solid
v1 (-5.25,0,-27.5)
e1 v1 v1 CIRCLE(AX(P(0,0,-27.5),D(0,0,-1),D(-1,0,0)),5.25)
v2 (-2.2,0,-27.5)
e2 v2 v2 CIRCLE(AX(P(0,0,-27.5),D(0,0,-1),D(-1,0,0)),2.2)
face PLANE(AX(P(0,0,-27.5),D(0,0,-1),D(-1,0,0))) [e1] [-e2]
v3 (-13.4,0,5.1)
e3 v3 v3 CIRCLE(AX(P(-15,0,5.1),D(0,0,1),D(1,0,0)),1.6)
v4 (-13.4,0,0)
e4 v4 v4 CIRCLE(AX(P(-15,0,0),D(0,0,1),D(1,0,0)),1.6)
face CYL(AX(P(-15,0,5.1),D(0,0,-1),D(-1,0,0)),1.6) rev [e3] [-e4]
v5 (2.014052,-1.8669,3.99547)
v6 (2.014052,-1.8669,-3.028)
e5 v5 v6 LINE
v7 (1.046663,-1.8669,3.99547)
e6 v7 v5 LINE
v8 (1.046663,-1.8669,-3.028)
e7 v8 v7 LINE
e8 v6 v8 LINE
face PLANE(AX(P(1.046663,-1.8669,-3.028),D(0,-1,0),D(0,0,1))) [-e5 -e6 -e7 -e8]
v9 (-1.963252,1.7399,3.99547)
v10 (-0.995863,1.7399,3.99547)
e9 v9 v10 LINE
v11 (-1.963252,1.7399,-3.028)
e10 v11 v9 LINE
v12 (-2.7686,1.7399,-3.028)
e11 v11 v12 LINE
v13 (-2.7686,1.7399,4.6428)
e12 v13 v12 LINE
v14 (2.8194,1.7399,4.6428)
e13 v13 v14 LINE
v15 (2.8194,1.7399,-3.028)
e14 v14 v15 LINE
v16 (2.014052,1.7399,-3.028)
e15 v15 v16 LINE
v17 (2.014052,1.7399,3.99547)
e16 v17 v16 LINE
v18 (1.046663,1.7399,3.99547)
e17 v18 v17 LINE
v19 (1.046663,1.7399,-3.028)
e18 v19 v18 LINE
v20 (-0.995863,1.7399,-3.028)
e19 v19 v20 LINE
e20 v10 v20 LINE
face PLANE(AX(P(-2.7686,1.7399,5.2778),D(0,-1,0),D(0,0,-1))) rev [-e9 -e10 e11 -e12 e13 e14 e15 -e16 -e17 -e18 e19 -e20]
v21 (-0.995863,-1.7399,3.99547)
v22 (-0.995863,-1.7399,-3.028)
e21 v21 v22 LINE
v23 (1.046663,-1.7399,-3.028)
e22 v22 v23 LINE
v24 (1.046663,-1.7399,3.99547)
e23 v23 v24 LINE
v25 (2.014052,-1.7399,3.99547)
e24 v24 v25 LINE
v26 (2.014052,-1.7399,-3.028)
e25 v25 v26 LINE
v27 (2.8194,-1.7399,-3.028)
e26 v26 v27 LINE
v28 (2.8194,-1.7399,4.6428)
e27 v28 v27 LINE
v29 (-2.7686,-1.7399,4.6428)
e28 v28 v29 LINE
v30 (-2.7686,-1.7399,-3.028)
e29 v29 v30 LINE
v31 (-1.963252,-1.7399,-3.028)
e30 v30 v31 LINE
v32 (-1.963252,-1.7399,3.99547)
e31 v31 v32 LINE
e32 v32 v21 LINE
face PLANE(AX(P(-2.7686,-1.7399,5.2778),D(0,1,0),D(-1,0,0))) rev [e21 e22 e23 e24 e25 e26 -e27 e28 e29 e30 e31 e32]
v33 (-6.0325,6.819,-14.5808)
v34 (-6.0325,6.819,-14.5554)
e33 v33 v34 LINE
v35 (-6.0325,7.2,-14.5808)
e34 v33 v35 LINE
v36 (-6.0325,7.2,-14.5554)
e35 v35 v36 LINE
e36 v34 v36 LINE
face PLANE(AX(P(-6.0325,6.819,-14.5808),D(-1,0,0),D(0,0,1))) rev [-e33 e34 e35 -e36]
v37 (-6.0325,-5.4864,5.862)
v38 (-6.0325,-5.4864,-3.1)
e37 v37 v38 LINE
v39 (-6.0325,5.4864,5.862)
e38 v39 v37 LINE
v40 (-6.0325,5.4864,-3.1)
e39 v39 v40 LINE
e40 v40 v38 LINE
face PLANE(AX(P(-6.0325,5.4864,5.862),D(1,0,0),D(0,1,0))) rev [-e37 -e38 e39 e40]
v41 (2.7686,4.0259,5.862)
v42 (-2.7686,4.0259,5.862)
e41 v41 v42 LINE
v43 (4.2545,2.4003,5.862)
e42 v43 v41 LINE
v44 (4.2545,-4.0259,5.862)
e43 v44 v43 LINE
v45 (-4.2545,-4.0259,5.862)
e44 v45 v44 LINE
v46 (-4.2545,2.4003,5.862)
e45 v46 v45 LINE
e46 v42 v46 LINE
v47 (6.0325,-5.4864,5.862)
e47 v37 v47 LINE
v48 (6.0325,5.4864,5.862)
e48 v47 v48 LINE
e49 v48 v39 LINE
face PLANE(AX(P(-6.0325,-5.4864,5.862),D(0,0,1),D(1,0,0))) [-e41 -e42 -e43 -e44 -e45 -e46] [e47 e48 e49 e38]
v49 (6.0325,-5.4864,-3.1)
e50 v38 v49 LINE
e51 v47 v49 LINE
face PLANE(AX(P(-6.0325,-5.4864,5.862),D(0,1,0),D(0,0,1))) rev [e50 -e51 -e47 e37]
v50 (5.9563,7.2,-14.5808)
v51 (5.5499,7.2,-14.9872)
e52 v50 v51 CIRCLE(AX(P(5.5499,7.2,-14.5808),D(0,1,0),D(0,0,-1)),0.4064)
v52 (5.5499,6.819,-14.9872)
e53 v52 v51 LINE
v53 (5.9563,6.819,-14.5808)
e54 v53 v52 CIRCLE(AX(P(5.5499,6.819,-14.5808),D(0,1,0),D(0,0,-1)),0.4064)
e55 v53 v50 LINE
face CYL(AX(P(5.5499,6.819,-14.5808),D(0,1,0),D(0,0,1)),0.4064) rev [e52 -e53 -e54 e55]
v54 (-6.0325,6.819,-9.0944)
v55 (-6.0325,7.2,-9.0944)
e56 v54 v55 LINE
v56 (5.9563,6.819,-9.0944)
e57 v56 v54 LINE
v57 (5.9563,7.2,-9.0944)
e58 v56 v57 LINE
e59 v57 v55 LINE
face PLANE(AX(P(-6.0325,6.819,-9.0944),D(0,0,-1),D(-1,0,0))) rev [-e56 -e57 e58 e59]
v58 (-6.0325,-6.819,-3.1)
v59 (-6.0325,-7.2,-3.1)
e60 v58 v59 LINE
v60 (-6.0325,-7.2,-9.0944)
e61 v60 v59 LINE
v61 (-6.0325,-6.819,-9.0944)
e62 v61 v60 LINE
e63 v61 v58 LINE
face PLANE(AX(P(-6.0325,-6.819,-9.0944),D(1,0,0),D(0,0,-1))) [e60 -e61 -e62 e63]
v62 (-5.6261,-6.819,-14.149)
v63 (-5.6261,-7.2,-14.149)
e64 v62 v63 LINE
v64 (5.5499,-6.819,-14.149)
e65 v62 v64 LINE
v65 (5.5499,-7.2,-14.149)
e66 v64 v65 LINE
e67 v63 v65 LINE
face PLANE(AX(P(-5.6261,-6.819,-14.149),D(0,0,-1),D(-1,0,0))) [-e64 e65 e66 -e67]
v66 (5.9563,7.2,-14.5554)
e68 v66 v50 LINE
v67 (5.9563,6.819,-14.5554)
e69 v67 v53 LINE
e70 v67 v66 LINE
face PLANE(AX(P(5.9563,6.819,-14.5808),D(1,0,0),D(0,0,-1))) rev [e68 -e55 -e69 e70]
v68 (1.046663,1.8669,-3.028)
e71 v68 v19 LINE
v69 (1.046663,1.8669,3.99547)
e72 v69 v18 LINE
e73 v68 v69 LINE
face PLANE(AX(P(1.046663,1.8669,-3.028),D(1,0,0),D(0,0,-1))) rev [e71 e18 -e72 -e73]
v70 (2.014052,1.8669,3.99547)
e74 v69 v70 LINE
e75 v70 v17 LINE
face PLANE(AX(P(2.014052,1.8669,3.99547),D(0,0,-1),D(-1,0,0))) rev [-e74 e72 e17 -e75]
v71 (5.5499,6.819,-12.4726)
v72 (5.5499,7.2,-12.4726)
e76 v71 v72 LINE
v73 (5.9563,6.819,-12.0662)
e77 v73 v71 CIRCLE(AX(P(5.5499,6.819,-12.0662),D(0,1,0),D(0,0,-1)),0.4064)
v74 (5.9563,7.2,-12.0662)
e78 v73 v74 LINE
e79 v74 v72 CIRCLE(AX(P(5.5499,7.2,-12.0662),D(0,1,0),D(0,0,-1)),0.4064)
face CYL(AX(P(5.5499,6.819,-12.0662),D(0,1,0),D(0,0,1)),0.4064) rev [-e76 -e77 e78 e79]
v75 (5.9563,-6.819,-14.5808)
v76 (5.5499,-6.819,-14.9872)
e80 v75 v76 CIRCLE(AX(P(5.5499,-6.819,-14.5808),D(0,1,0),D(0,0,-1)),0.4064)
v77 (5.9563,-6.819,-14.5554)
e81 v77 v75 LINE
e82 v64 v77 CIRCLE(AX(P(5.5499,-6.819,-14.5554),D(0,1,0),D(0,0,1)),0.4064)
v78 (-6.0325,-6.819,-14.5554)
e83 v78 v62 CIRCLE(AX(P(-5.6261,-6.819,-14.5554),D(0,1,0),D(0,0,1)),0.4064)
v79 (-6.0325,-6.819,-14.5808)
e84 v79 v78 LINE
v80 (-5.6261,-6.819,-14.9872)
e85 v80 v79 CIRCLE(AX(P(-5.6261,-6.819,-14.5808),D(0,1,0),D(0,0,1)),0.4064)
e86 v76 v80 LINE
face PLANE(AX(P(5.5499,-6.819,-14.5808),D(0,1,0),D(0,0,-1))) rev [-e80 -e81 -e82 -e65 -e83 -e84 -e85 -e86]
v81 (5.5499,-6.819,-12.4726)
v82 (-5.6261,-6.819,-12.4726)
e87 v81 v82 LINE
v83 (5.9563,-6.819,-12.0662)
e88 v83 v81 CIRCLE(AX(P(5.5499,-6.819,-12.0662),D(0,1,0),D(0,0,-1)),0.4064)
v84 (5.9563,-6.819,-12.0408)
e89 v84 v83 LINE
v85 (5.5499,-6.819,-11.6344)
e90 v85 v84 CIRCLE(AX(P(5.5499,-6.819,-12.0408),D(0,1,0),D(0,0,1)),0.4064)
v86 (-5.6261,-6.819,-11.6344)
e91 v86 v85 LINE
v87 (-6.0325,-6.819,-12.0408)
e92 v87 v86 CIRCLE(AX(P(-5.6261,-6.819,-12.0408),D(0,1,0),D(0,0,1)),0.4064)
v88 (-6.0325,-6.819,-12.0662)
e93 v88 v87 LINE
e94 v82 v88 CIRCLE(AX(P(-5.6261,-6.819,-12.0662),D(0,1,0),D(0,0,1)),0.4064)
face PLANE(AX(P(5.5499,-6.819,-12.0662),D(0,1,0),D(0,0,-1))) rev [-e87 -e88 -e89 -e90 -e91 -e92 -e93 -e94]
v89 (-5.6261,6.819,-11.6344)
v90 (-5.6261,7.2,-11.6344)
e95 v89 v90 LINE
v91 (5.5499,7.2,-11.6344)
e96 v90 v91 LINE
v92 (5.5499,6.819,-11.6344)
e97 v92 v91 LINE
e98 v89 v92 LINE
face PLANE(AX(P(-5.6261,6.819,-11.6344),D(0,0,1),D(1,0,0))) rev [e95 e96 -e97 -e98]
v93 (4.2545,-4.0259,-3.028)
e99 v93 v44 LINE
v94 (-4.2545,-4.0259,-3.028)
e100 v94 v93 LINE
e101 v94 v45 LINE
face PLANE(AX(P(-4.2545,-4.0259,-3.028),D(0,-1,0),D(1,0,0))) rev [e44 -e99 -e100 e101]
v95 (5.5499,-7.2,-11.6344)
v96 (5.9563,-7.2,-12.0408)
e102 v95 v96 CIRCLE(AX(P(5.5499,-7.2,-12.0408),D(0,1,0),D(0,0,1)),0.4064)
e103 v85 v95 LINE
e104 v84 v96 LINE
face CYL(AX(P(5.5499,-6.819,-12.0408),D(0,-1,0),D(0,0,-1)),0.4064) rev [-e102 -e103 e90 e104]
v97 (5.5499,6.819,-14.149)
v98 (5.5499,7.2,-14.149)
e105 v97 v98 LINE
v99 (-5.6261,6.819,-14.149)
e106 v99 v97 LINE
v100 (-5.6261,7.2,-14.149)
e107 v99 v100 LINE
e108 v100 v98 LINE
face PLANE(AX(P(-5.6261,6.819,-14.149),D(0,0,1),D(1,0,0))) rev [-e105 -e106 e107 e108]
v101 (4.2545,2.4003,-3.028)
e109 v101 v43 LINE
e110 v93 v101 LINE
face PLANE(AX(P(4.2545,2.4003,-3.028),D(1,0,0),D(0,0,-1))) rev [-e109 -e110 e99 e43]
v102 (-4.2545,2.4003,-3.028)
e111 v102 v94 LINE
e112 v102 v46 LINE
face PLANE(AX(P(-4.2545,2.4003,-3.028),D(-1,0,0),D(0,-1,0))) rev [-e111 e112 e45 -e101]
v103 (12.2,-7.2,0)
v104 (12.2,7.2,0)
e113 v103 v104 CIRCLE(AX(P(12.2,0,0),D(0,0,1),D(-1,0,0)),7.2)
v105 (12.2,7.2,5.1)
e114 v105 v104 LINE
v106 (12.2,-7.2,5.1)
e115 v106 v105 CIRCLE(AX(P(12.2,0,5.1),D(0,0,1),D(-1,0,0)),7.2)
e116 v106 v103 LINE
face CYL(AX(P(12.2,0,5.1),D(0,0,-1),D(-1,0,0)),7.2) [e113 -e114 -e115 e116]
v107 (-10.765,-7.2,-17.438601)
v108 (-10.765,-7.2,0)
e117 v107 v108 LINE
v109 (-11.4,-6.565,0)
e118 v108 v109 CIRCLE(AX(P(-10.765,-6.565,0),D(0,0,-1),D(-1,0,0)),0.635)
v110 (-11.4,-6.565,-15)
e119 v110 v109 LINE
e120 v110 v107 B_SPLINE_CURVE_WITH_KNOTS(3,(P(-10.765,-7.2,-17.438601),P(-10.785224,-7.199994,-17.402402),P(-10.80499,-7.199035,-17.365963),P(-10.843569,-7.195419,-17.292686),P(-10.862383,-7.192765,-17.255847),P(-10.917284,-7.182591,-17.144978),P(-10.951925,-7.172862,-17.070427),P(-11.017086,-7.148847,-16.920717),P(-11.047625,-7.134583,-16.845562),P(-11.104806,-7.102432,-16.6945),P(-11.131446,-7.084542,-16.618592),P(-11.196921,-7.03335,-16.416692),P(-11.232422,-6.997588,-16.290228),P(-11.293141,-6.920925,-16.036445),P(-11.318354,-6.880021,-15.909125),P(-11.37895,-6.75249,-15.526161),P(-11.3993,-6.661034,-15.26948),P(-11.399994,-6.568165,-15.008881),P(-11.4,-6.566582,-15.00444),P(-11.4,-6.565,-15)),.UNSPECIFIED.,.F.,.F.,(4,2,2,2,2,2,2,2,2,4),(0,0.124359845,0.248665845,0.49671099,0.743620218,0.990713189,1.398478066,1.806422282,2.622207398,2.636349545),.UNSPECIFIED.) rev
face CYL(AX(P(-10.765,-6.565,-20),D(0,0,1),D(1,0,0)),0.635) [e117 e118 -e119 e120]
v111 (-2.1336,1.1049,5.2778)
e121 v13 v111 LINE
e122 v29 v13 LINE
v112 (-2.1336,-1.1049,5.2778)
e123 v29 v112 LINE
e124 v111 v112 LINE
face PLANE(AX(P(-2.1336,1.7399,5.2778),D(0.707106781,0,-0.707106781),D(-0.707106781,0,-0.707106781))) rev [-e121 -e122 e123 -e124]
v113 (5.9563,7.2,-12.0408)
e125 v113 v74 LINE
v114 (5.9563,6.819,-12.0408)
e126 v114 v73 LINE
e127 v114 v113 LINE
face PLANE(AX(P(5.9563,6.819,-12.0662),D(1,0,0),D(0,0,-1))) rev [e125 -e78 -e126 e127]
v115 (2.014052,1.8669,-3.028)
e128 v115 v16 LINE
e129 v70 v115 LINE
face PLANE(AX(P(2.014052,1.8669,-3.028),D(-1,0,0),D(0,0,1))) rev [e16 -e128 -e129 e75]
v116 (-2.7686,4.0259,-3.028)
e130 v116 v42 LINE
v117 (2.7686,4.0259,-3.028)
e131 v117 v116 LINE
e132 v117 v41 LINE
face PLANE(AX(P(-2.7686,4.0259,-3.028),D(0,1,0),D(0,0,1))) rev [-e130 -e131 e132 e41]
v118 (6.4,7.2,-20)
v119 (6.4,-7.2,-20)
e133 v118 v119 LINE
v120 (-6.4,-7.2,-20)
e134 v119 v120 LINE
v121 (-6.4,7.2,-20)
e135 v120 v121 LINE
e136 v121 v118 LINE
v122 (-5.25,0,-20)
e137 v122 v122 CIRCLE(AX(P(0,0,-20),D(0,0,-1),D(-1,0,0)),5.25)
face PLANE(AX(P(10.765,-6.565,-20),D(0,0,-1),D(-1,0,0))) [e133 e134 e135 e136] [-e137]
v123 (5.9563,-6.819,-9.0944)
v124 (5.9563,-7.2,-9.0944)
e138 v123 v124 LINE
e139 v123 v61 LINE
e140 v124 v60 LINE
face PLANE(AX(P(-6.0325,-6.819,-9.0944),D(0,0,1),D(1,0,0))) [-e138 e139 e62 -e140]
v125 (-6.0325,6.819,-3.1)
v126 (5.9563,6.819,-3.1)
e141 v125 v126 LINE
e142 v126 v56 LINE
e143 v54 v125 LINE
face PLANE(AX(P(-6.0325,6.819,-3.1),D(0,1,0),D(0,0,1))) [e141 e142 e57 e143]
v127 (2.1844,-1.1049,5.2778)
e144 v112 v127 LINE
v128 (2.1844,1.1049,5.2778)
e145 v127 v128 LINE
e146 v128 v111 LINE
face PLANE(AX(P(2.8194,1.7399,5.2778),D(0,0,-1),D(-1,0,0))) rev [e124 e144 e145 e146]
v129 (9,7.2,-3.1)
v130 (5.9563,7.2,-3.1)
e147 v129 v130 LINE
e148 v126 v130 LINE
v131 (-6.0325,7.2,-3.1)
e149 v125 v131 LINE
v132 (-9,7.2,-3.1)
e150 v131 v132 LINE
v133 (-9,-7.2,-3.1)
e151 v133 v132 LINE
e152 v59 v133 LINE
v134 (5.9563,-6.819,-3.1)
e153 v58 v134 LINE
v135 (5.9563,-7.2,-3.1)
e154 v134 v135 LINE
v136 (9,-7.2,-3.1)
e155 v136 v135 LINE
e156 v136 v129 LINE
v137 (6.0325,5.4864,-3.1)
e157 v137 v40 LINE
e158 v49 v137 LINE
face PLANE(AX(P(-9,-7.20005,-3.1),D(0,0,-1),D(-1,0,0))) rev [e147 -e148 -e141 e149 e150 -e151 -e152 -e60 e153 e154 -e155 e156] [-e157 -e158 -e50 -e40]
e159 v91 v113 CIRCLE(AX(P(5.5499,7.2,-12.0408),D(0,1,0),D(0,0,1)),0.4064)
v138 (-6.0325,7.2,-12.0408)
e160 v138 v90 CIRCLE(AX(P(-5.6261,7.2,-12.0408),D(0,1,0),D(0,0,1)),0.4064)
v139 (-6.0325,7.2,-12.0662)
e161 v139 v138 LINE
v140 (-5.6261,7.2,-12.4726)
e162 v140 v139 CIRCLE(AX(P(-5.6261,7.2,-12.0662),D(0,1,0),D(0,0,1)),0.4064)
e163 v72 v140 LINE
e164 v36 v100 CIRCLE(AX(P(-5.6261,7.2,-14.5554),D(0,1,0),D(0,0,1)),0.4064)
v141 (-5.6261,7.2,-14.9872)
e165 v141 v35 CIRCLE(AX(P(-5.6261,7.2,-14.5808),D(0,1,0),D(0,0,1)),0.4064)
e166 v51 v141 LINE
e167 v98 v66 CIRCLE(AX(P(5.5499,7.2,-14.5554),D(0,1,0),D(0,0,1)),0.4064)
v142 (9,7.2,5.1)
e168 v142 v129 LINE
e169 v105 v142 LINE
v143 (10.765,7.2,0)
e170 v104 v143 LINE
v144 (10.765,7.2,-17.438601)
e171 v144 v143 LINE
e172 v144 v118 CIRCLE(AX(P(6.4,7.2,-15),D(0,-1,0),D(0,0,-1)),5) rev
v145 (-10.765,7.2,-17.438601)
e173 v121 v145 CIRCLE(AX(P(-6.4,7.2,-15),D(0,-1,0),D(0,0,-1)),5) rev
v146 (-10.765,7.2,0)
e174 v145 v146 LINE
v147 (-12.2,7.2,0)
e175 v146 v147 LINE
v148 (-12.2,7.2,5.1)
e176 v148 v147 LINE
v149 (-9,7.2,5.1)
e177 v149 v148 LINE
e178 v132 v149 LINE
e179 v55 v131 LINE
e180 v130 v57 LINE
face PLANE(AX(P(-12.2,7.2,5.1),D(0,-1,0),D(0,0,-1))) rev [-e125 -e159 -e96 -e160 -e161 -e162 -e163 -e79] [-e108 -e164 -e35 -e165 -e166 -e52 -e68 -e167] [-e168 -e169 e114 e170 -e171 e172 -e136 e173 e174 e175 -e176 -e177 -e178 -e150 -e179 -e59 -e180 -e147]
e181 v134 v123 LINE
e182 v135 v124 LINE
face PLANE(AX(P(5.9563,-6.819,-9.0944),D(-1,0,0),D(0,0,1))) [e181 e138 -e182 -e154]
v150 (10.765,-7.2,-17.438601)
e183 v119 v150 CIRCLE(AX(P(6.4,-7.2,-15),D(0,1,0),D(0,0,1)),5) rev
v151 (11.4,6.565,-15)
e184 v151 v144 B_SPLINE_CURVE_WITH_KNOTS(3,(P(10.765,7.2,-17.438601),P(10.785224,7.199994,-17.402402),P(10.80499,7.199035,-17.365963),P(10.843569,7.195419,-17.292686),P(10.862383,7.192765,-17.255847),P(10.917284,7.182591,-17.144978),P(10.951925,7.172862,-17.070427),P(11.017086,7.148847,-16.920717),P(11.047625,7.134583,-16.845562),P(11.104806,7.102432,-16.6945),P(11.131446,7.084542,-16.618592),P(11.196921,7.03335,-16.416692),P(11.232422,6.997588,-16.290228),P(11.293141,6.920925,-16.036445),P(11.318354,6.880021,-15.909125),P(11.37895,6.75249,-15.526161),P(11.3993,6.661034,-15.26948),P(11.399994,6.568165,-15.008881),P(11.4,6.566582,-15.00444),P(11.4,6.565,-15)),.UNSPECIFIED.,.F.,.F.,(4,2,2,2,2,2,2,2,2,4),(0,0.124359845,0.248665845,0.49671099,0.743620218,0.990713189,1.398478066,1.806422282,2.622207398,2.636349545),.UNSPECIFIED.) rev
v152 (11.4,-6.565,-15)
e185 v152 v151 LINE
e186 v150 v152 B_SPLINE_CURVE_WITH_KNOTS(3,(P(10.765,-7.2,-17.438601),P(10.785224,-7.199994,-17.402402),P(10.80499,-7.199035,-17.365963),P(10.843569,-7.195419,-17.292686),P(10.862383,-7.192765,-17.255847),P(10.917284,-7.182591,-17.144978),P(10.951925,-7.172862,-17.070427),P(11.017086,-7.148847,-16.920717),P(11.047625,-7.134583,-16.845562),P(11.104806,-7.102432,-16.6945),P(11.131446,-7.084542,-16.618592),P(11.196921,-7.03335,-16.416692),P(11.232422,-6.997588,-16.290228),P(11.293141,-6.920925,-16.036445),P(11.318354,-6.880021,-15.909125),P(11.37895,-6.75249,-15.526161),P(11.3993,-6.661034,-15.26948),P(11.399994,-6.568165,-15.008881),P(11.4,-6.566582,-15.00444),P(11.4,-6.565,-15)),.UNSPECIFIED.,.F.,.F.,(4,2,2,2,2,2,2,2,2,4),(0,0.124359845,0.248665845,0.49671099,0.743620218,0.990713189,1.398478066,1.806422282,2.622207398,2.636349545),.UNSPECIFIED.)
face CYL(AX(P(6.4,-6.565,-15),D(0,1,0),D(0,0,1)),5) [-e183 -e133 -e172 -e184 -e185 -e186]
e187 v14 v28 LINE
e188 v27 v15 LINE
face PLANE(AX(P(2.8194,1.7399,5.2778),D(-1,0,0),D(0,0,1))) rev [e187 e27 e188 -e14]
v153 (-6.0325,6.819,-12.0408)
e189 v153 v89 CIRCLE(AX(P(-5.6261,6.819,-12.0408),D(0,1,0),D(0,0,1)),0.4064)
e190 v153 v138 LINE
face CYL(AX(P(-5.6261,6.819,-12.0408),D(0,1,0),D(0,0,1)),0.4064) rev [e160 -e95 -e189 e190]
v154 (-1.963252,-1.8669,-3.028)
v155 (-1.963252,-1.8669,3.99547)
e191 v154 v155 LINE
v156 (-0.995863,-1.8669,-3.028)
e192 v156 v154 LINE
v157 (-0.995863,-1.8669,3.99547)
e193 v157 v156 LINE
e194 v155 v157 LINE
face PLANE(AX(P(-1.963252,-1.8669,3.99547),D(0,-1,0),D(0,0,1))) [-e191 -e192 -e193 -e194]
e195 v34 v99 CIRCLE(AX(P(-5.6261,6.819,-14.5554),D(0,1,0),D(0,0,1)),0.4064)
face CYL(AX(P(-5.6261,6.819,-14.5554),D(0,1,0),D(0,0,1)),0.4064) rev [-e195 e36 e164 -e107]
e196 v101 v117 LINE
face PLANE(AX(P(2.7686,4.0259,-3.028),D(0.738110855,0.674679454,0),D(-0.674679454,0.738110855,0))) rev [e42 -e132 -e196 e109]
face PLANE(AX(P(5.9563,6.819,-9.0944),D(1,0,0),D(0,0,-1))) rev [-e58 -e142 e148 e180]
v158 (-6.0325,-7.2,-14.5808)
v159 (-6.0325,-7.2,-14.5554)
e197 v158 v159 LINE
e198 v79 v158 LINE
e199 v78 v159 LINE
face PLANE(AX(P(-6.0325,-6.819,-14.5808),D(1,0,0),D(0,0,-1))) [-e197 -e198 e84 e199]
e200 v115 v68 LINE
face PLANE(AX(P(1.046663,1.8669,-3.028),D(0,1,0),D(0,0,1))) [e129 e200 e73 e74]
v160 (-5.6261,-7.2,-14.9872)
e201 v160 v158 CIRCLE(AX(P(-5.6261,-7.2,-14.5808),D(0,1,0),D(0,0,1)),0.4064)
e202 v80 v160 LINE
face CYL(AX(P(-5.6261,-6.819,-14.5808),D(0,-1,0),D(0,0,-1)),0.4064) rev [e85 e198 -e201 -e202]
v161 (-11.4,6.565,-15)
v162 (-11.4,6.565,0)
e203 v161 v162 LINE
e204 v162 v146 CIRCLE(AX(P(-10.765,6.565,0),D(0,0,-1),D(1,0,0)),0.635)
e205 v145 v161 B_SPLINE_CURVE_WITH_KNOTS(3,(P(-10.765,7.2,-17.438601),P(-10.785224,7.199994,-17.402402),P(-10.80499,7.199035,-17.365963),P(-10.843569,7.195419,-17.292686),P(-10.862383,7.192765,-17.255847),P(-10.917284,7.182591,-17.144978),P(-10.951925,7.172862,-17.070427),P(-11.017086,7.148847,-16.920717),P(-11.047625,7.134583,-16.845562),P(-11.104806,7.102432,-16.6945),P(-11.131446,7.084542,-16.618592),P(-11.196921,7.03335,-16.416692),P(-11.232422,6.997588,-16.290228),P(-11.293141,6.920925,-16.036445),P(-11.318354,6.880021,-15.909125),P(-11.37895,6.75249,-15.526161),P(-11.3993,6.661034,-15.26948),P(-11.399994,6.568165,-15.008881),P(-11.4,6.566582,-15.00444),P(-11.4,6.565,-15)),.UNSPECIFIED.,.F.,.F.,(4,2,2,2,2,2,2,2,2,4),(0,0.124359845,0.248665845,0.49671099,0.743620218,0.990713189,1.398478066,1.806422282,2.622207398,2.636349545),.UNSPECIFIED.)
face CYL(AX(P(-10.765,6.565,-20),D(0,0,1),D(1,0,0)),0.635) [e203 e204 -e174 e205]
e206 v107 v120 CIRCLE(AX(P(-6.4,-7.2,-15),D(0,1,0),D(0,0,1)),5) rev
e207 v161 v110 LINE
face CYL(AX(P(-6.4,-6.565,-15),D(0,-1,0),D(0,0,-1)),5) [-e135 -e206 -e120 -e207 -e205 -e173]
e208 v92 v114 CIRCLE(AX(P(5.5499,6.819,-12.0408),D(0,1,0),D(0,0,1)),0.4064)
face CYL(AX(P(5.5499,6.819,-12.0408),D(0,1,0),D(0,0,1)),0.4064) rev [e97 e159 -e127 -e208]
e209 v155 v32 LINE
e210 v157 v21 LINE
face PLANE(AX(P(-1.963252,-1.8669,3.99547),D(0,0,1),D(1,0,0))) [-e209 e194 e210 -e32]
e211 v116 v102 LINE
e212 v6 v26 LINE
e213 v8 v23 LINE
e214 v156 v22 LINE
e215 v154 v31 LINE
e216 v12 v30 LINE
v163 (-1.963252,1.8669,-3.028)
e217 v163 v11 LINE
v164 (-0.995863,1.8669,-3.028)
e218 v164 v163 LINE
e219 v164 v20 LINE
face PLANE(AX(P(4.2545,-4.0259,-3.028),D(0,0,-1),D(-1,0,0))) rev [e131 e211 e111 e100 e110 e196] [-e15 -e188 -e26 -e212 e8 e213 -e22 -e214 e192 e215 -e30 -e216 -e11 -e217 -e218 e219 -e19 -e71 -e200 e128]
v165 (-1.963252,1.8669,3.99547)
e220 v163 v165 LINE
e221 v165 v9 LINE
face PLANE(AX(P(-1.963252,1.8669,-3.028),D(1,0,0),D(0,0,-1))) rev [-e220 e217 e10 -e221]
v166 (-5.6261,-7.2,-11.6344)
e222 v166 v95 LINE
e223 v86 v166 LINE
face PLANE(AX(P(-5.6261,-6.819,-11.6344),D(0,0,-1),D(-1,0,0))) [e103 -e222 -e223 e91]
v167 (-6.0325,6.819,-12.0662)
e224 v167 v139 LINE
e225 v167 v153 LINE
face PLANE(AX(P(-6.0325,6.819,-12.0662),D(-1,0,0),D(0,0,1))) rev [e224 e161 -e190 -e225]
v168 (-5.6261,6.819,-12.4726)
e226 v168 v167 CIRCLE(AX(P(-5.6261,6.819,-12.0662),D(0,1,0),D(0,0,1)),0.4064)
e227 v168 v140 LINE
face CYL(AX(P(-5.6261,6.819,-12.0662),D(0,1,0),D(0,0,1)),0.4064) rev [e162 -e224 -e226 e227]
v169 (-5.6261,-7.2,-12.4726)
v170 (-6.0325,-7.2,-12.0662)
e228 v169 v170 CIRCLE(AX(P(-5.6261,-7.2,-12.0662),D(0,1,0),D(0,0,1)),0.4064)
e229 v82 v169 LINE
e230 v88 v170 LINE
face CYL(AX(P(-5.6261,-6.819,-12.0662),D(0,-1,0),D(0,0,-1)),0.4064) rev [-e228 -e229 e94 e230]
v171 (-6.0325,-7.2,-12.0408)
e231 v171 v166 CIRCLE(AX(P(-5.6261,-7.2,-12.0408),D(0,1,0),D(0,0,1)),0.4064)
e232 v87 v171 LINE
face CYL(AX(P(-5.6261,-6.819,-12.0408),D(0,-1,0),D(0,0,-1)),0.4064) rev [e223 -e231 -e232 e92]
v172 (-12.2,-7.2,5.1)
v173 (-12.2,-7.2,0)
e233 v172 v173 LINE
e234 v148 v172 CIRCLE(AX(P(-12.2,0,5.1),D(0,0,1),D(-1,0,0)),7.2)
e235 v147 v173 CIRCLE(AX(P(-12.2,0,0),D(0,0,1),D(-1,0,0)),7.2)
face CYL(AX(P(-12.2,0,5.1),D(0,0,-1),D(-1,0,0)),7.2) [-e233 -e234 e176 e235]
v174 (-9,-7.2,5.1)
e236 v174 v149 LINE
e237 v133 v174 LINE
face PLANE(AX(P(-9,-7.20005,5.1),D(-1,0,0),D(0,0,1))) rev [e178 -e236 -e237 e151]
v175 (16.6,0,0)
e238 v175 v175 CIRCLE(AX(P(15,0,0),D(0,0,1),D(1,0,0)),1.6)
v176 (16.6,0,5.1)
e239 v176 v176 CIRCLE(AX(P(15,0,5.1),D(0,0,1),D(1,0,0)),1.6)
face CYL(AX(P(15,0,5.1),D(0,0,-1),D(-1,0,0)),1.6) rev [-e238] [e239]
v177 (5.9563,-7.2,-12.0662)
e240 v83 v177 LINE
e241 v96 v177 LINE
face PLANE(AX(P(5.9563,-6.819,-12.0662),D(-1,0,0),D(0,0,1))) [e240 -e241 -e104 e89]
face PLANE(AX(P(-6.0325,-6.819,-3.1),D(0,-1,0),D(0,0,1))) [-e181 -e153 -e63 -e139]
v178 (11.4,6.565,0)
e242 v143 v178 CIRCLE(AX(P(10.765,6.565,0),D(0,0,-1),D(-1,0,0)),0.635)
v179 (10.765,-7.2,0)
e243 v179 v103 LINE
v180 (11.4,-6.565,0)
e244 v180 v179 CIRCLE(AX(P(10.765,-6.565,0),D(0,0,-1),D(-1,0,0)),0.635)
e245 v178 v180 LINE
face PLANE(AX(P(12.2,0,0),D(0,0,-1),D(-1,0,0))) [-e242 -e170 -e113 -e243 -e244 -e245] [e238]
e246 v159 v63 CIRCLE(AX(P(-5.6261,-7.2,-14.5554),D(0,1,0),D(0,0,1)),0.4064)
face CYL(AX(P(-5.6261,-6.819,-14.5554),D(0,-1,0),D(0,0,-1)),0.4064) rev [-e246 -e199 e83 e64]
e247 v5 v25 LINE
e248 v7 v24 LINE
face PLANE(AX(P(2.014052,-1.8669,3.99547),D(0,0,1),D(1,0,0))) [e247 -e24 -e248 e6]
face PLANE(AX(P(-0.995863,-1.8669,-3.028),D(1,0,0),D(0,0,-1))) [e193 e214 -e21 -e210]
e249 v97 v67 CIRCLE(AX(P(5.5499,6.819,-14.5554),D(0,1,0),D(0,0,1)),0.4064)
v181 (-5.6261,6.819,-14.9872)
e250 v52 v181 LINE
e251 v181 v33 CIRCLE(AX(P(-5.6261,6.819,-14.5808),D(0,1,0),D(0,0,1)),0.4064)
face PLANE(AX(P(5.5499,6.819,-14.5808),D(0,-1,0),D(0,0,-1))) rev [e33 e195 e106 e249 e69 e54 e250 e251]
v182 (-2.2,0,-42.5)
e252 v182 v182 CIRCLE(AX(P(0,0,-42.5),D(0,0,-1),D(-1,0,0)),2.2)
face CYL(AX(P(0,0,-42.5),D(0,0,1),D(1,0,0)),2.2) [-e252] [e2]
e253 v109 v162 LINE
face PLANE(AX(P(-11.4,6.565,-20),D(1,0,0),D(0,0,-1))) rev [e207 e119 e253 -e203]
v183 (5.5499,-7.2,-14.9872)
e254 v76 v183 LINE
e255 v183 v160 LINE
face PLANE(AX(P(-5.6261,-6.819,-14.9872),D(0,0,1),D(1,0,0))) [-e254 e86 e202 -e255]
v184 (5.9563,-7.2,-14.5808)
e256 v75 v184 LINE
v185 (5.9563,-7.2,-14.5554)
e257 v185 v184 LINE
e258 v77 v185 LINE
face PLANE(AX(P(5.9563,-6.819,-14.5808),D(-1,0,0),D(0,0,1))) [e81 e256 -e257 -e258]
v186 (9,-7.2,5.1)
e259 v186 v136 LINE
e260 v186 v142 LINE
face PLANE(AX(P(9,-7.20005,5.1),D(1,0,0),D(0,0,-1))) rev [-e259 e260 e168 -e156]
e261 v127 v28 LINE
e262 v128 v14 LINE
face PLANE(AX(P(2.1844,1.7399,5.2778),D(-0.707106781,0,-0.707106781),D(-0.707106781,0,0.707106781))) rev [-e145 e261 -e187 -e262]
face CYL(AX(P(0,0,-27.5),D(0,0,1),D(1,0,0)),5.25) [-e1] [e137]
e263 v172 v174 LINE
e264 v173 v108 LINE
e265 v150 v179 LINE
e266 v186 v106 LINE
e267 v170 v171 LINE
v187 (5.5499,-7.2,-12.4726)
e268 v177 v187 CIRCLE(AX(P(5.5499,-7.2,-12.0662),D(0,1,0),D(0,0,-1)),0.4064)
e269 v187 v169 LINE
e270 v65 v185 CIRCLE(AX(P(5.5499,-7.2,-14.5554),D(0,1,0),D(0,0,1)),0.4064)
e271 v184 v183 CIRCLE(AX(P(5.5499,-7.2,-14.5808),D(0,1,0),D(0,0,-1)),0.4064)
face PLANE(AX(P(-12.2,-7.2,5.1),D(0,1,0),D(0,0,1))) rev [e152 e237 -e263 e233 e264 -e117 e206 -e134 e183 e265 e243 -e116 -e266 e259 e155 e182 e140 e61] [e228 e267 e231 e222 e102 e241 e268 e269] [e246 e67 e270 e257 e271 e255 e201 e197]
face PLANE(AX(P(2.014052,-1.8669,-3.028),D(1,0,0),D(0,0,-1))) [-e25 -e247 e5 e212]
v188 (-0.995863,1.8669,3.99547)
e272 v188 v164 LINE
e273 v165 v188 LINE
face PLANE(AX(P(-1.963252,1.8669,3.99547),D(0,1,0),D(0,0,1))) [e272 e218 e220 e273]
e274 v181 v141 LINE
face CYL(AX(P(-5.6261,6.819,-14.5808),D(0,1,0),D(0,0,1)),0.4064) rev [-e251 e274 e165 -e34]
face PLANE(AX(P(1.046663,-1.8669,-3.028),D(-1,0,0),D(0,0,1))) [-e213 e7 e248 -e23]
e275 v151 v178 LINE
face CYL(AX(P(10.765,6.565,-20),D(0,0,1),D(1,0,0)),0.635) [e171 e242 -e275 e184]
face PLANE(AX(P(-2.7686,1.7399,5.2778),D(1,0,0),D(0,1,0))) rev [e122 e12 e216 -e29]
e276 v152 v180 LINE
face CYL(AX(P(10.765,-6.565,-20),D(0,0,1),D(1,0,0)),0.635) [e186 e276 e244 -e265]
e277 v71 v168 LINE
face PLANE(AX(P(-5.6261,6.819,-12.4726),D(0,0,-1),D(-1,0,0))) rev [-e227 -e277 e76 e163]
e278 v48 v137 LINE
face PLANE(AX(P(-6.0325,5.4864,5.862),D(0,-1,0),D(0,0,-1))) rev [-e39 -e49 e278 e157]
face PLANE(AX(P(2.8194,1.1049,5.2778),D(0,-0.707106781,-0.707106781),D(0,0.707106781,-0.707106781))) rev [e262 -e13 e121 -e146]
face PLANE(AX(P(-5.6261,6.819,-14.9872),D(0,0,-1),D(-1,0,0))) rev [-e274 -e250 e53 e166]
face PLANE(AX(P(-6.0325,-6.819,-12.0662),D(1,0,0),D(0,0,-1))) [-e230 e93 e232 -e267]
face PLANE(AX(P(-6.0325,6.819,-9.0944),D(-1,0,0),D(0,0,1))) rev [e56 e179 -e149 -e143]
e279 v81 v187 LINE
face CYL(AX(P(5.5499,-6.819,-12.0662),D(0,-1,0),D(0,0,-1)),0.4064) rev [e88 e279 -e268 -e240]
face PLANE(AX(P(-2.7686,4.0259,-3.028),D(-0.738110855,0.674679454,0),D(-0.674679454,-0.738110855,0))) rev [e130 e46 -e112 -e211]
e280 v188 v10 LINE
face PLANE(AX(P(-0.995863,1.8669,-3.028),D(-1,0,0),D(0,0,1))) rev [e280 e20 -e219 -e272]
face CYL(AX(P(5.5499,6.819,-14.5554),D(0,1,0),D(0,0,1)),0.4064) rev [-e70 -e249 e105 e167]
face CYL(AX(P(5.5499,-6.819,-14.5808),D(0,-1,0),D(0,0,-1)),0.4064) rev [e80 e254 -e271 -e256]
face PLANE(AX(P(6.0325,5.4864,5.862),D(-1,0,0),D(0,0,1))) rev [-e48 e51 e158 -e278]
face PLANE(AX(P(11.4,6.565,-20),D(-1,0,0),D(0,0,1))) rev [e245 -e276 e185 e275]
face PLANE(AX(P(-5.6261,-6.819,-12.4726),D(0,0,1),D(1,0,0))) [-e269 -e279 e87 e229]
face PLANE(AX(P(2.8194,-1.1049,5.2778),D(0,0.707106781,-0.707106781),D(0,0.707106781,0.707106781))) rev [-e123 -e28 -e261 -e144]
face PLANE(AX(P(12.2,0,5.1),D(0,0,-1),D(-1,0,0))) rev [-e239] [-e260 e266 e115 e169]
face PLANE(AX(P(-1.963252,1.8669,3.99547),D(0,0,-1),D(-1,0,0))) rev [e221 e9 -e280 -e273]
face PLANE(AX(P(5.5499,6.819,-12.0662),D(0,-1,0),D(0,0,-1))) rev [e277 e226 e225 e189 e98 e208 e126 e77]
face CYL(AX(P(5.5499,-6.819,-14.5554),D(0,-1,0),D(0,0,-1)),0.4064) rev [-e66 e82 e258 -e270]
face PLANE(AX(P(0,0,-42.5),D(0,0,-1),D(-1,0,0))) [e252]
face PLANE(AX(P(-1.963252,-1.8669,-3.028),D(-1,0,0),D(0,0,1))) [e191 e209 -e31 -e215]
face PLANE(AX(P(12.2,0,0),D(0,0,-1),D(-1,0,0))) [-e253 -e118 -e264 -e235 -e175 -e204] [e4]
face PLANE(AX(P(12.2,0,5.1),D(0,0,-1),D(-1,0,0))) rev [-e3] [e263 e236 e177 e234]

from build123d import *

# Parameters (mm, degrees)
SKETCH1_R           = 1.6
BOSS_EXTRUDE1_DEPTH = 5.1
BOSS_EXTRUDE2_DEPTH = 20
SKETCH3_R           = 5.25
BOSS_EXTRUDE3_DEPTH = 7.5
SKETCH4_R           = 2.2
BOSS_EXTRUDE4_DEPTH = 15
SKETCH11_W          = 18
SKETCH11_H          = 8.2
CUT_EXTRUDE3_DEPTH  = 49.887319419
SKETCH5_W           = 12.065
SKETCH5_H           = 10.9728
BOSS_EXTRUDE5_DEPTH = 0.762
SKETCH12_W          = 12.065
SKETCH12_H          = 10.9728
BOSS_EXTRUDE9_DEPTH = 8.2
CUT_EXTRUDE1_DEPTH  = 8.89
SKETCH7_W           = 5.588
SKETCH7_H           = 3.4798
BOSS_EXTRUDE6_DEPTH = 8.3058
CHAMFER1_SIZE       = 0.635
SKETCH8_W           = 0.967388598
SKETCH8_H           = 7.023469871
BOSS_EXTRUDE7_DEPTH = 0.127
SKETCH9_W           = 11.9888
SKETCH9_H           = 5.9944
CUT_EXTRUDE2_DEPTH  = 0.381
FILLET1_R           = 5


with BuildPart() as part:
    # Sketch1 → Boss-Extrude1 (new body)
    with BuildSketch(Plane.XY):
        with BuildLine():
            Line((-12.2, -7.2), (12.2, -7.2))
            ThreePointArc((12.2, -7.2), (19.4, 0), (12.2, 7.2))
            Line((12.2, 7.2), (-12.2, 7.2))
            ThreePointArc((-12.2, 7.2), (-19.4, 0), (-12.2, -7.2))
        make_face()
        with Locations((-15, 0)):
            Circle(SKETCH1_R, mode=Mode.SUBTRACT)
        with Locations((15, 0)):
            Circle(SKETCH1_R, mode=Mode.SUBTRACT)
    extrude(amount=BOSS_EXTRUDE1_DEPTH)

    # Sketch2 → Boss-Extrude2 (add)
    with BuildSketch(Plane(origin=(0, 0, 0), x_dir=(-1, 0, 0), z_dir=(0, 0, -1))):
        with BuildLine():
            Line((-10.765, 7.2), (10.765, 7.2))
            ThreePointArc((10.765, 7.2), (11.214012806, 7.014012806), (11.4, 6.565))
            Line((11.4, 6.565), (11.4, -6.565))
            ThreePointArc((11.4, -6.565), (11.214012806, -7.014012806), (10.765, -7.2))
            Line((10.765, -7.2), (-10.765, -7.2))
            ThreePointArc((-10.765, -7.2), (-11.214012806, -7.014012806), (-11.4, -6.565))
            Line((-11.4, -6.565), (-11.4, 6.565))
            ThreePointArc((-11.4, 6.565), (-11.214012806, 7.014012806), (-10.765, 7.2))
        make_face()
    extrude(amount=BOSS_EXTRUDE2_DEPTH)

    # Sketch3 → Boss-Extrude3 (add)
    with BuildSketch(Plane(origin=(0, 0, -20), x_dir=(-1, 0, 0), z_dir=(0, 0, -1))):
        Circle(SKETCH3_R)
    extrude(amount=BOSS_EXTRUDE3_DEPTH)

    # Sketch4 → Boss-Extrude4 (add)
    with BuildSketch(Plane(origin=(0, 0, -27.5), x_dir=(-1, 0, 0), z_dir=(0, 0, -1))):
        Circle(SKETCH4_R)
    extrude(amount=BOSS_EXTRUDE4_DEPTH)

    # Sketch11 → Cut-Extrude3 (cut, through all)
    with BuildSketch(Plane(origin=(0, 7.2, 0), x_dir=(1, 0, 0), z_dir=(0, 1, 0))):
        with Locations((0, -1)):
            Rectangle(SKETCH11_W, SKETCH11_H)
    extrude(amount=-CUT_EXTRUDE3_DEPTH, mode=Mode.SUBTRACT)



with BuildPart() as body_2:
    # Sketch5 → Boss-Extrude5 (new body)
    with BuildSketch(Plane.XY.offset(5.1)):
        Rectangle(SKETCH5_W, SKETCH5_H)
    extrude(amount=BOSS_EXTRUDE5_DEPTH)


with BuildPart() as part_1:
    add(part.part)

    add(body_2.part)  # Boss-Extrude9 merges body 2
    # Sketch12 → Boss-Extrude9 (add)
    with BuildSketch(Plane.XY.offset(-3.1)):
        Rectangle(SKETCH12_W, SKETCH12_H)
    extrude(amount=BOSS_EXTRUDE9_DEPTH)

    # Sketch6 → Cut-Extrude1 (cut)
    with BuildSketch(Plane.XY.offset(5.862)):
        Polygon((-4.2545, 2.4003), (-4.2545, -4.0259), (4.2545, -4.0259), (4.2545, 2.4003), (2.7686, 4.0259), (-2.7686, 4.0259), align=None)
    extrude(amount=-CUT_EXTRUDE1_DEPTH, mode=Mode.SUBTRACT)

    # Sketch7 → Boss-Extrude6 (add)
    with BuildSketch(Plane.XY.offset(-3.028)):
        with Locations((0.0254, 0)):
            Rectangle(SKETCH7_W, SKETCH7_H)
    extrude(amount=BOSS_EXTRUDE6_DEPTH)

    # Chamfer1
    chamfer1_edges = [part_1.edges().sort_by_distance(p)[0] for p in [
        (0.0254, 1.7399, 5.2778),
        (-2.7686, 0, 5.2778),
        (0.0254, -1.7399, 5.2778),
        (2.8194, 0, 5.2778),
    ]]
    chamfer(chamfer1_edges, length=CHAMFER1_SIZE)

    # Sketch8 → Boss-Extrude7 (add)
    with BuildSketch(Plane(origin=(0, 1.7399, 0), x_dir=(1, 0, 0), z_dir=(0, 1, 0))):
        with Locations((-1.479557486, -0.483734936)):
            Rectangle(SKETCH8_W, SKETCH8_H)
        with Locations((1.530357486, -0.483734936)):
            Rectangle(SKETCH8_W, SKETCH8_H)
    boss_extrude7 = extrude(amount=BOSS_EXTRUDE7_DEPTH)

    # Mirror1: Boss-Extrude7 across plane
    add(boss_extrude7.mirror(Plane(origin=(0, 0, 0), x_dir=(0, 0, 1), z_dir=(0, -1, 0))))

    # Sketch9 → Cut-Extrude2 (cut)
    with BuildSketch(Plane(origin=(0, 7.2, 0), x_dir=(1, 0, 0), z_dir=(0, 1, 0))):
        with Locations((-0.0381, 6.0972)):
            Rectangle(SKETCH9_W, SKETCH9_H)
        with BuildLine():
            Line((-5.6261, 12.4726), (5.5499, 12.4726))
            ThreePointArc((5.5499, 12.4726), (5.837268196, 12.353568196), (5.9563, 12.0662))
            Line((5.9563, 12.0662), (5.9563, 12.0408))
            ThreePointArc((5.9563, 12.0408), (5.837268196, 11.753431804), (5.5499, 11.6344))
            Line((5.5499, 11.6344), (-5.6261, 11.6344))
            ThreePointArc((-5.6261, 11.6344), (-5.913468196, 11.753431804), (-6.0325, 12.0408))
            Line((-6.0325, 12.0408), (-6.0325, 12.0662))
            ThreePointArc((-6.0325, 12.0662), (-5.913468196, 12.353568196), (-5.6261, 12.4726))
        make_face()
        with BuildLine():
            Line((-5.6261, 14.9872), (5.5499, 14.9872))
            ThreePointArc((5.5499, 14.9872), (5.837268196, 14.868168196), (5.9563, 14.5808))
            Line((5.9563, 14.5808), (5.9563, 14.5554))
            ThreePointArc((5.9563, 14.5554), (5.837268196, 14.268031804), (5.5499, 14.149))
            Line((5.5499, 14.149), (-5.6261, 14.149))
            ThreePointArc((-5.6261, 14.149), (-5.913468196, 14.268031804), (-6.0325, 14.5554))
            Line((-6.0325, 14.5554), (-6.0325, 14.5808))
            ThreePointArc((-6.0325, 14.5808), (-5.913468196, 14.868168196), (-5.6261, 14.9872))
        make_face()
    cut_extrude2 = extrude(amount=-CUT_EXTRUDE2_DEPTH, mode=Mode.SUBTRACT)

    # Mirror3: Cut-Extrude2 across plane
    add(cut_extrude2.mirror(Plane.ZX), mode=Mode.SUBTRACT)

    # Fillet1
    # the kernel refuses this fillet: 5 mm, written as the material it takes off along each edge
    with BuildSketch(Plane(origin=(11.4, -19.065, -20), x_dir=(-1, 0, 0), z_dir=(0, 1, 0)), Plane(origin=(-11.4, 19.065, -20), x_dir=(1, 0, 0), z_dir=(0, -1, 0))) as fillet1_piece_1:
        with BuildLine():
            CenterArc((FILLET1_R, FILLET1_R), FILLET1_R, 180, 90)
            Line((0, FILLET1_R), (0, 0))
            Line((0, 0), (FILLET1_R, 0))
        make_face()
    extrude(amount=38.13, mode=Mode.SUBTRACT)


solid = part_1.part
